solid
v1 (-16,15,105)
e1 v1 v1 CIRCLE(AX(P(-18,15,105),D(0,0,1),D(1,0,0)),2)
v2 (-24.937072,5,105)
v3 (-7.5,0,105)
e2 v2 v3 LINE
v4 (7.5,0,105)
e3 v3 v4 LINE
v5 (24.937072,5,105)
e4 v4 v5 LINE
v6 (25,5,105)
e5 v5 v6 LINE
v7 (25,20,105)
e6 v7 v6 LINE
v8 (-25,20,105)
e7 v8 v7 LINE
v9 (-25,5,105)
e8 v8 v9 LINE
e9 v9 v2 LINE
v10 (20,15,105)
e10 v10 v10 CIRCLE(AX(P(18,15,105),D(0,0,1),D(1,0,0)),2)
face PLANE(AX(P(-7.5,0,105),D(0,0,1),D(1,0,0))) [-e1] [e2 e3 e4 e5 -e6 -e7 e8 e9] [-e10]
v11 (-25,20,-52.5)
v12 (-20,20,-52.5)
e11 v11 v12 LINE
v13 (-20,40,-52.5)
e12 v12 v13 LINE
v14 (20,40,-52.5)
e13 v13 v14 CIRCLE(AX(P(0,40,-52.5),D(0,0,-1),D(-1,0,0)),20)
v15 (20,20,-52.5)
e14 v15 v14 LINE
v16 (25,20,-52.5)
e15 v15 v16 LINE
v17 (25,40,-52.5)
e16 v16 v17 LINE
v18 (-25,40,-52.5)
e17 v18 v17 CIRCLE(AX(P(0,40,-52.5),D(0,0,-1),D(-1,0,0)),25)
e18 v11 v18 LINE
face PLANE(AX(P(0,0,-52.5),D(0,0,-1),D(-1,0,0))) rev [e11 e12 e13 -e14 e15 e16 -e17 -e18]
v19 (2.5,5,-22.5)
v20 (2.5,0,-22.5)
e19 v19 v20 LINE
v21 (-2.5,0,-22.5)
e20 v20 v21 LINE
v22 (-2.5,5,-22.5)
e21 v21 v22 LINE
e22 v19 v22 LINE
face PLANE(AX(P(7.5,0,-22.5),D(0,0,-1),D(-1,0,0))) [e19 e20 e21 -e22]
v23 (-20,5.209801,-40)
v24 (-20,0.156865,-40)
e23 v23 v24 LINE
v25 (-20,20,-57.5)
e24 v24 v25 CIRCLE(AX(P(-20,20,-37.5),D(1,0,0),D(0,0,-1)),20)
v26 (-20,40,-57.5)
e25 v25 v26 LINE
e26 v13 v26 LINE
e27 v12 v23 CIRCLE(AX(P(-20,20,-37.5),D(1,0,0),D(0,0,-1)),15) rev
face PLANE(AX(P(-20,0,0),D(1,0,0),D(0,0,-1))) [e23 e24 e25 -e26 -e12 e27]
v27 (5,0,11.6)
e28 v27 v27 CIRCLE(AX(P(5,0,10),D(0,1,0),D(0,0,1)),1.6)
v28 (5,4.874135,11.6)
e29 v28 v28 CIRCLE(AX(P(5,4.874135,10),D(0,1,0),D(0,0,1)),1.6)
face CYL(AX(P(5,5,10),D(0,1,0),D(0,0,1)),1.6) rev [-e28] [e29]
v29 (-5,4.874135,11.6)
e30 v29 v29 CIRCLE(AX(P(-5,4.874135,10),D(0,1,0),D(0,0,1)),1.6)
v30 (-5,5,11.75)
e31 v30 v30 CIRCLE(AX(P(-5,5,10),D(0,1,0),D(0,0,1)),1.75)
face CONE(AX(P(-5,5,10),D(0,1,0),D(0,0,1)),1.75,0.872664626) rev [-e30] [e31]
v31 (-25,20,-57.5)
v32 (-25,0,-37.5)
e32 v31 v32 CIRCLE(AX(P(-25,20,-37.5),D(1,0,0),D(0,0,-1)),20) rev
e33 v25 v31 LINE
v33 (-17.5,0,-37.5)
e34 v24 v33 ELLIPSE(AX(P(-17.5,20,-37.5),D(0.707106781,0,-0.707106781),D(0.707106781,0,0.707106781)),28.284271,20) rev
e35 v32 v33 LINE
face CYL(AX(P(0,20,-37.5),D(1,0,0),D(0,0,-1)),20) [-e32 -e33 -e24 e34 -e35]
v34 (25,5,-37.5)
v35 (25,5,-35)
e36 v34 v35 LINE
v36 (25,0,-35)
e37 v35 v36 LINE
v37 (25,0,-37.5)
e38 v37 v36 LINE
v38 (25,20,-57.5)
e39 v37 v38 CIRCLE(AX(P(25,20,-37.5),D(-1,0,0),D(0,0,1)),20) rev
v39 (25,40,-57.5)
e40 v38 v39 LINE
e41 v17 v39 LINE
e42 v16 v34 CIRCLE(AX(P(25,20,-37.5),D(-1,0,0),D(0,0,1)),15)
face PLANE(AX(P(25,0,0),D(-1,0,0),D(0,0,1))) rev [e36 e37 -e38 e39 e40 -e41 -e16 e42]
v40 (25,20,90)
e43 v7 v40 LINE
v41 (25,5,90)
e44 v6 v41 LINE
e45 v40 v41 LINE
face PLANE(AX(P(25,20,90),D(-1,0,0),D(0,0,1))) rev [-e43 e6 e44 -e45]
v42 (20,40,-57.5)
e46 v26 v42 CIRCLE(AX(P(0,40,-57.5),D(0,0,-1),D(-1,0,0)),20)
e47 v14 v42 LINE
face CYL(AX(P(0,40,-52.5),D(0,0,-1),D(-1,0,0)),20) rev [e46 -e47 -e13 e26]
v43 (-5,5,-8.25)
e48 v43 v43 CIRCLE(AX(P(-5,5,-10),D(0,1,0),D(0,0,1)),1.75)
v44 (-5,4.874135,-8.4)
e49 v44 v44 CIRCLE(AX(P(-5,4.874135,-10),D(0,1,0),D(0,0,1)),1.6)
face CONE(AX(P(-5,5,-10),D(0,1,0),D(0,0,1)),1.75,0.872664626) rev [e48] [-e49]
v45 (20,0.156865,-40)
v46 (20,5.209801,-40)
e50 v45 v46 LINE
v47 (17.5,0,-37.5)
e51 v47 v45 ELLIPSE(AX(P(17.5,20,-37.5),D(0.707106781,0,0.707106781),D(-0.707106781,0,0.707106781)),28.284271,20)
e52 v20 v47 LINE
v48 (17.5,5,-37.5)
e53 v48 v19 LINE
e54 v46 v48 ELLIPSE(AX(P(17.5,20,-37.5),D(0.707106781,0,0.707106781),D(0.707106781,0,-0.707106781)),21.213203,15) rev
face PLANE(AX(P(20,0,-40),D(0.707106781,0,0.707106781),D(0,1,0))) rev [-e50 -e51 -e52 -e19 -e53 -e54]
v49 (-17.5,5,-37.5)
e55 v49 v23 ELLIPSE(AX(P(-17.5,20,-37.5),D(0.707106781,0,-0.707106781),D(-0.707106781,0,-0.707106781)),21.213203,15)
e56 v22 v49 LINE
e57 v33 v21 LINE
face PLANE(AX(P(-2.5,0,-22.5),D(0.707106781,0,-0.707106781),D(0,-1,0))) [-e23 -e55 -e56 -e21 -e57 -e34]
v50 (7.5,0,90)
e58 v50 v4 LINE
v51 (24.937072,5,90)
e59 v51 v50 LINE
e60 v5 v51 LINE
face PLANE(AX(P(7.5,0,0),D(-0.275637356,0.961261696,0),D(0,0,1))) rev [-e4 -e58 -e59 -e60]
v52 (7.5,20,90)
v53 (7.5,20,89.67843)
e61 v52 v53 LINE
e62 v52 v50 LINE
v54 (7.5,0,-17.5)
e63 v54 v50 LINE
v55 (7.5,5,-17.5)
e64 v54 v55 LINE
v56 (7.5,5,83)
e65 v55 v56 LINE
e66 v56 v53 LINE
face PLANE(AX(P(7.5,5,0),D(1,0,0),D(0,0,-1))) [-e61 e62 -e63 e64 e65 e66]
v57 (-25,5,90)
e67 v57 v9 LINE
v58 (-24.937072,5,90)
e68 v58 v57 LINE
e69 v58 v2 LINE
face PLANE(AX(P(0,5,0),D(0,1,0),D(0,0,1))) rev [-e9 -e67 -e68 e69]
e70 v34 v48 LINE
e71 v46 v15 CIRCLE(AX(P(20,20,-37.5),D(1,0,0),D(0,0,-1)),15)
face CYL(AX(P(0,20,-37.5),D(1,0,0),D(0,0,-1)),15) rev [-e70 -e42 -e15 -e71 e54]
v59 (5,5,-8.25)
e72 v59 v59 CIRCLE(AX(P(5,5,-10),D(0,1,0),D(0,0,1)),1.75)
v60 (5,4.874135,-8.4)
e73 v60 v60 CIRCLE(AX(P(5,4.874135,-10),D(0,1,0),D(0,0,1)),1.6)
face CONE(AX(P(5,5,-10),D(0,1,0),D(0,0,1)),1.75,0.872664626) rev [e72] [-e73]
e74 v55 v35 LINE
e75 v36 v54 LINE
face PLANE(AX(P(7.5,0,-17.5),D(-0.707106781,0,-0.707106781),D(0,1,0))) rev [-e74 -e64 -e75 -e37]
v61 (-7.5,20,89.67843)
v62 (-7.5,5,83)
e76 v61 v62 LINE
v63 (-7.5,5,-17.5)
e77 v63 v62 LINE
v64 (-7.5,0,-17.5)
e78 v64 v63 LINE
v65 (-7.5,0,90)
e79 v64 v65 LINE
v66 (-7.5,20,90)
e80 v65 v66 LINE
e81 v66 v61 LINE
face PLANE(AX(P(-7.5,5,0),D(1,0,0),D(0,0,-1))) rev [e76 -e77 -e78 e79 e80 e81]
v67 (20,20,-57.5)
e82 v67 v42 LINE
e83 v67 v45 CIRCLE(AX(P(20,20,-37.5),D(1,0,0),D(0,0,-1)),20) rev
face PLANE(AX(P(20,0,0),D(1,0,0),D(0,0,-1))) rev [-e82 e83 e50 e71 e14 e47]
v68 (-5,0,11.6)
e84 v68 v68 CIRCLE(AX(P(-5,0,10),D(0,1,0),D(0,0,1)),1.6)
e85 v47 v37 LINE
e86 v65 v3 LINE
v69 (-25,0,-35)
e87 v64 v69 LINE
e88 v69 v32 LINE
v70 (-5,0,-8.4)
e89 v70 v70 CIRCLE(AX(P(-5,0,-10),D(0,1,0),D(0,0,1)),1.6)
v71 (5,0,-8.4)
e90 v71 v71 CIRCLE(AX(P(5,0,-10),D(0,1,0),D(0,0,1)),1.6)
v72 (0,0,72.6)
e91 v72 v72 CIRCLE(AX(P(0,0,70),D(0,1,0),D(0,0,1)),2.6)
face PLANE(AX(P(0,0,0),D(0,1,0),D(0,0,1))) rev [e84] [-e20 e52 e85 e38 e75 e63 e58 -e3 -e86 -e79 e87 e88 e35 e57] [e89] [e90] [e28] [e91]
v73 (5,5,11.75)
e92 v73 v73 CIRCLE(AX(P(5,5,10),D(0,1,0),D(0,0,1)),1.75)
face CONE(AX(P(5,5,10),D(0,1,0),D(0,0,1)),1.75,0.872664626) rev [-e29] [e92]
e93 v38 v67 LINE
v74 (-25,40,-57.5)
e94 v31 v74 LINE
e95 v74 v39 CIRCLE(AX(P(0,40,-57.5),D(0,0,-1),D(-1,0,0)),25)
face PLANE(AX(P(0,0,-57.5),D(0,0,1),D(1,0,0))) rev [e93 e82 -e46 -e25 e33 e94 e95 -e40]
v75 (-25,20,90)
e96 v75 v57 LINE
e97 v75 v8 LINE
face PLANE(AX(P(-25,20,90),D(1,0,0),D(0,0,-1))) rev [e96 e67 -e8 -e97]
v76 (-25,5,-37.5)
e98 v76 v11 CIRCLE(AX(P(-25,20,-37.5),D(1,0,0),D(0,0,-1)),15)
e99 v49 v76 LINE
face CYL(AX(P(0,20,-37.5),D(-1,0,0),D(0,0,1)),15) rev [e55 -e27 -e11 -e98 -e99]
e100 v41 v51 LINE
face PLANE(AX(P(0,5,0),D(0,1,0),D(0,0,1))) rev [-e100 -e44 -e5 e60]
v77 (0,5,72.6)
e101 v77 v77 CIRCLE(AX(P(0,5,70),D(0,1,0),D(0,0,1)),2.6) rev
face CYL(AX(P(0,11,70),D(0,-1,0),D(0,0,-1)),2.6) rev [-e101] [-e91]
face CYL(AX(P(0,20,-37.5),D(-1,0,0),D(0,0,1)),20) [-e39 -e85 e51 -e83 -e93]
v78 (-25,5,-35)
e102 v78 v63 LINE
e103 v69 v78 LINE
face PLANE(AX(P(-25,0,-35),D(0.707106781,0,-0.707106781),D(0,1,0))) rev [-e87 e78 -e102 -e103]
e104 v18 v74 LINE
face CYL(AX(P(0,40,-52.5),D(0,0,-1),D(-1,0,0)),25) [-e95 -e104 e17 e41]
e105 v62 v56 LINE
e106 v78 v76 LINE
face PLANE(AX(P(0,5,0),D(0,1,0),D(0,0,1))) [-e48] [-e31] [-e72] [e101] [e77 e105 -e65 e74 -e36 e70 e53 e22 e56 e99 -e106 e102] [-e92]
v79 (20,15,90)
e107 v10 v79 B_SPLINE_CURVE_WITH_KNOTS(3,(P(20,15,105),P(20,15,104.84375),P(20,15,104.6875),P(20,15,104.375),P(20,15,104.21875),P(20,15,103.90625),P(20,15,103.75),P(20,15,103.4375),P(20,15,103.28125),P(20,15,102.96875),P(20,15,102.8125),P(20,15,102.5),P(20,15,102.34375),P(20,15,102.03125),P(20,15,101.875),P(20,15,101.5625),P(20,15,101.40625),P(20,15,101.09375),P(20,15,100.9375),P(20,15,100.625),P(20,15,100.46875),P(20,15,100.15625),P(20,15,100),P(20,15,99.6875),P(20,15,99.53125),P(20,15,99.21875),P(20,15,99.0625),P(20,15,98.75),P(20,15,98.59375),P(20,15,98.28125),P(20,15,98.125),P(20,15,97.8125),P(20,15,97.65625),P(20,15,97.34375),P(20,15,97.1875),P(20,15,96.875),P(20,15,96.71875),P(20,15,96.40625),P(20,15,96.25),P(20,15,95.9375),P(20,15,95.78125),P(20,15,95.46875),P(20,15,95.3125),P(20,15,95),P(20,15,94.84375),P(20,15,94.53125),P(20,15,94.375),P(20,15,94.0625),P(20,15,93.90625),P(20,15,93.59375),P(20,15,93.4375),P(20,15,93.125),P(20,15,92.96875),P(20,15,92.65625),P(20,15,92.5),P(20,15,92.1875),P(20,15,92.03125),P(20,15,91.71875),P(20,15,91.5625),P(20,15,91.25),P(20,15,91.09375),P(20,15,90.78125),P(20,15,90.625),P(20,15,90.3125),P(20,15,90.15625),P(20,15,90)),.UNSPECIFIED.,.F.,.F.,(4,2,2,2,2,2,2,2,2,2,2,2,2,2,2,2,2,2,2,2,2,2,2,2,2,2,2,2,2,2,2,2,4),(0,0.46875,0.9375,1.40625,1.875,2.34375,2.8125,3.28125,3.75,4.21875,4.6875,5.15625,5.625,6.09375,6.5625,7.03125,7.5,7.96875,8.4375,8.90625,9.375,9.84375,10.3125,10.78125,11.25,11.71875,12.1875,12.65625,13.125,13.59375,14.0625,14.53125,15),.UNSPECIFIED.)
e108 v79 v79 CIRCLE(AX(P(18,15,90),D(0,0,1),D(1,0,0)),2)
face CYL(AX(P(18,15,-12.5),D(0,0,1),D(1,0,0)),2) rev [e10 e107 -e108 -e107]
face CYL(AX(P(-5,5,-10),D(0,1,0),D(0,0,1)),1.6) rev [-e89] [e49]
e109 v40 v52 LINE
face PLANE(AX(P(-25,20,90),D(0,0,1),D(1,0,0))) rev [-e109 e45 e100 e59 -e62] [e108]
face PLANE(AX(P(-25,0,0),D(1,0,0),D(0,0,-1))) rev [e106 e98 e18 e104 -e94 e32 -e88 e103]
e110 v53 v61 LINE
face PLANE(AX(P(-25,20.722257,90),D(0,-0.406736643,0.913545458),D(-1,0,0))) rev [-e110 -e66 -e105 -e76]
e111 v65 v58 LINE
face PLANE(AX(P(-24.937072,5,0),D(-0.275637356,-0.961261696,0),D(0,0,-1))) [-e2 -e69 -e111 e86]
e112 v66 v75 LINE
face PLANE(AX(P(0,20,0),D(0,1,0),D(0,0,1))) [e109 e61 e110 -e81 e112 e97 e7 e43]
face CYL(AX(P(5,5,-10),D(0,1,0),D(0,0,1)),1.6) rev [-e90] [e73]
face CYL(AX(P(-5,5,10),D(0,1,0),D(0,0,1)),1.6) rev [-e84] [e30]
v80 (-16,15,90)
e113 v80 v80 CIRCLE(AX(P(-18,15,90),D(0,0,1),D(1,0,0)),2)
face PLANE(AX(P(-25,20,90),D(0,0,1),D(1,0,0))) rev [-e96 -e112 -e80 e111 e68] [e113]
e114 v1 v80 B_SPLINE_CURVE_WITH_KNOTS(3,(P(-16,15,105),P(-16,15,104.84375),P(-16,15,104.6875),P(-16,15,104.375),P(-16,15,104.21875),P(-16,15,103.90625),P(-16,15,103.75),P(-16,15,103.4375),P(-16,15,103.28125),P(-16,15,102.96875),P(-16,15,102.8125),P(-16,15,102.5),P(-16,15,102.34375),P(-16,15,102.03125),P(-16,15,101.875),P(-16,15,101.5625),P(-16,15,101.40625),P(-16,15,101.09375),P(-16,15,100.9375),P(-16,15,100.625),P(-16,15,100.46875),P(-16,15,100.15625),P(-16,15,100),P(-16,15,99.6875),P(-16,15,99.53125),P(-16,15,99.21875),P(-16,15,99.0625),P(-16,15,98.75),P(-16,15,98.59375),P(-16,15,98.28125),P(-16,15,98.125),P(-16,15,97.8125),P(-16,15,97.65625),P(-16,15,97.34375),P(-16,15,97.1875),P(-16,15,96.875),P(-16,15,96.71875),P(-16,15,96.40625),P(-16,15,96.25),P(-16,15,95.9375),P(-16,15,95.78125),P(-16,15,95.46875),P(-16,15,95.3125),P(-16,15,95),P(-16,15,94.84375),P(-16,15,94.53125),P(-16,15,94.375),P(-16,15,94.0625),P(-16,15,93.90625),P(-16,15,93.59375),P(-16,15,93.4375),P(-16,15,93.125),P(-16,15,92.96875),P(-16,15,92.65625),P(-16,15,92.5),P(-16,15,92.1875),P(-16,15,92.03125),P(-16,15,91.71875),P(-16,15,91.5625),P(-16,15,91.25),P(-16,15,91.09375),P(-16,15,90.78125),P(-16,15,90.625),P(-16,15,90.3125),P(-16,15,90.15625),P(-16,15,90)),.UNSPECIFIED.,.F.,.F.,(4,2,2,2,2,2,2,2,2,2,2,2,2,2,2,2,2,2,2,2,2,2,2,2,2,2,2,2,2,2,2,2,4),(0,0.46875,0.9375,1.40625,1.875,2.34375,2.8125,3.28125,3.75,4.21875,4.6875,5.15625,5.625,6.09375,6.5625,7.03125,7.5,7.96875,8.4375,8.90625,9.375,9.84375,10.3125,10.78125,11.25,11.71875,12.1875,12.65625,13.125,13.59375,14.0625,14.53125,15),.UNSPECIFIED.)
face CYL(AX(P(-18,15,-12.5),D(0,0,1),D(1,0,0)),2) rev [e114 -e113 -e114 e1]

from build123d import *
from OCP.BRepFilletAPI import BRepFilletAPI_MakeChamfer

# Parameters (mm, degrees)
SKETCH1_W           = 15
SKETCH1_H           = 27.5
SKETCH1_W_2         = 10
SKETCH1_H_2         = 20
BOSS_EXTRUDE1_DEPTH = 5
SKETCH8_W           = 15
SKETCH8_H           = 90
BOSS_EXTRUDE2_DEPTH = 5
SKETCH9_R           = 2.6
CUT_EXTRUDE1_DEPTH  = 11
SKETCH11_W          = 50
SKETCH11_H          = 15
BOSS_EXTRUDE4_DEPTH = 15
CHAMFER1_SIZE       = 5
CHAMFER1_SIZE_2     = 17.437072219
CHAMFER2_SIZE       = 15.722257417
CHAMFER2_SIZE_2     = 7
SKETCH12_R          = 2
CUT_EXTRUDE2_DEPTH  = 122.783619588
SKETCH13_W          = 15
SKETCH13_H          = 10
BOSS_EXTRUDE5_DEPTH = 5
SKETCH15_W          = 5
SKETCH15_H          = 35
BOSS_EXTRUDE7_DEPTH = 5
BOSS_EXTRUDE8_DEPTH = 5
FILLET1_R           = 15
FILLET2_R           = 20
CHAMFER3_SIZE       = 17.5


# Read off the part's stored shape, not the designer's step: Ø3.0mm Dowel Hole1
# Some blends are built 0.0001 mm under size
with BuildPart() as part:
    # Sketch1 → Boss-Extrude1 (new body)
    # profile 1 of 2: a face of its own
    with BuildSketch(Plane(origin=(0, 0, 0), x_dir=(1, 0, 0), z_dir=(0, 1, 0))):
        with Locations((0, -1.25)):
            Rectangle(SKETCH1_W, SKETCH1_H)
        Rectangle(SKETCH1_W_2, SKETCH1_H_2, mode=Mode.SUBTRACT)
    # profile 2 of 2: a face of its own
    with BuildSketch(Plane(origin=(0, 0, 0), x_dir=(1, 0, 0), z_dir=(0, 1, 0))):
        Rectangle(SKETCH1_W_2, SKETCH1_H_2)
    extrude(amount=BOSS_EXTRUDE1_DEPTH)

    # Ø3.0mm Dowel Hole1 outline → Ø3.0mm Dowel Hole1 (revolve, cut)
    with BuildSketch(Plane(origin=(5, 0, -10), x_dir=(1, 0, 0), z_dir=(0, 0, 1))):
        Polygon((0, 0), (1.6, 0), (1.6, 4.874135055), (1.75, 5), (0, 5), align=None)
    revolve(axis=Axis((5, 0, -10), (0, 1, 0)), mode=Mode.SUBTRACT)

    # 3.0mm Dowel Hole1 2 outline → 3.0mm Dowel Hole1 2 (revolve, cut)
    with BuildSketch(Plane(origin=(-5, 0, 10), x_dir=(1, 0, 0), z_dir=(0, 0, 1))):
        Polygon((0, 0), (1.6, 0), (1.6, 4.874135055), (1.75, 5), (0, 5), align=None)
    revolve(axis=Axis((-5, 0, 10), (0, 1, 0)), mode=Mode.SUBTRACT)

    # 3.0mm Dowel Hole1 3 outline → 3.0mm Dowel Hole1 3 (revolve, cut)
    with BuildSketch(Plane(origin=(-5, 0, -10), x_dir=(1, 0, 0), z_dir=(0, 0, 1))):
        Polygon((0, 0), (1.6, 0), (1.6, 4.874135055), (1.75, 5), (0, 5), align=None)
    revolve(axis=Axis((-5, 0, -10), (0, 1, 0)), mode=Mode.SUBTRACT)

    # 3.0mm Dowel Hole1 4 outline → 3.0mm Dowel Hole1 4 (revolve, cut)
    with BuildSketch(Plane(origin=(5, 0, 10), x_dir=(1, 0, 0), z_dir=(0, 0, 1))):
        Polygon((0, 0), (1.6, 0), (1.6, 4.874135055), (1.75, 5), (0, 5), align=None)
    revolve(axis=Axis((5, 0, 10), (0, 1, 0)), mode=Mode.SUBTRACT)

    # Sketch8 → Boss-Extrude2 (add)
    with BuildSketch(Plane(origin=(0, 5, 0), x_dir=(1, 0, 0), z_dir=(0, 1, 0))):
        with Locations((0, -60)):
            Rectangle(SKETCH8_W, SKETCH8_H)
    extrude(amount=-BOSS_EXTRUDE2_DEPTH)

    # Sketch9 → Cut-Extrude1 (cut)
    with BuildSketch(Plane(origin=(0, 0, 0), x_dir=(1, 0, 0), z_dir=(0, 1, 0))):
        with Locations(Location((0, -70, 0), (0, 0, 270))):
            Circle(SKETCH9_R)
    extrude(amount=CUT_EXTRUDE1_DEPTH, mode=Mode.SUBTRACT)

    # Sketch11 → Boss-Extrude4 (add)
    with BuildSketch(Plane(origin=(0, 5, 0), x_dir=(1, 0, 0), z_dir=(0, 1, 0))):
        with Locations((0, -97.5)):
            Rectangle(SKETCH11_W, SKETCH11_H)
    extrude(amount=BOSS_EXTRUDE4_DEPTH)

    # Chamfer1
    chamfer1_edges_1 = [part.edges().sort_by_distance(p)[0] for p in [
        (7.5, 5, 97.5),
    ]]
    chamfer1_side_1 = [part.faces().sort_by_distance(p)[0] for p in [
        (7.5, 4.9, 97.5),
    ]]
    chamfer1_edges_2 = [part.edges().sort_by_distance(p)[0] for p in [
        (-7.5, 5, 97.5),
    ]]
    chamfer1_side_2 = [part.faces().sort_by_distance(p)[0] for p in [
        (-7.5, 4.9, 97.5),
    ]]
    chamfer1 = BRepFilletAPI_MakeChamfer(part.part.solid().wrapped)
    for e in chamfer1_edges_1:
        chamfer1.Add(CHAMFER1_SIZE - 0.0001, CHAMFER1_SIZE_2 - 0.0001, e.wrapped, chamfer1_side_1[0].wrapped)
    for e in chamfer1_edges_2:
        chamfer1.Add(CHAMFER1_SIZE - 0.0001, CHAMFER1_SIZE_2 - 0.0001, e.wrapped, chamfer1_side_2[0].wrapped)
    add(Compound.cast(chamfer1.Shape()), mode=Mode.REPLACE)  # a hair under: the kernel refuses the full size

    # Chamfer2
    # the kernel refuses this chamfer: 15.722257417, 7 mm, written as the material it adds along each edge
    with BuildSketch(Plane(origin=(-7.5, 5, 90), x_dir=(0, 0.9998768419809391, 0.015693975602887097), z_dir=(1, 0, 0))) as chamfer2_piece_1_section:
        Polygon((CHAMFER2_SIZE * 0.999876842002, -CHAMFER2_SIZE * 0.0156939756032), (-CHAMFER2_SIZE_2 * 0.0156939756029, -CHAMFER2_SIZE_2 * 0.999876841981), (0, 0), align=None)
    chamfer2_piece_1 = extrude(amount=15, mode=Mode.PRIVATE)
    chamfer2_piece_1 = split(chamfer2_piece_1, bisect_by=Plane(origin=(0, 20, 87.661958793), z_dir=(0, -1, 0)), keep=Keep.TOP, mode=Mode.PRIVATE)
    add(chamfer2_piece_1)

    # Sketch12 → Cut-Extrude2 (cut, through all)
    with BuildSketch(Plane.XY.offset(105)):
        with Locations((-18, 15)):
            Circle(SKETCH12_R)
        with Locations((18, 15)):
            Circle(SKETCH12_R)
    extrude(amount=-CUT_EXTRUDE2_DEPTH, mode=Mode.SUBTRACT)

    # Sketch13 → Boss-Extrude5 (add)
    with BuildSketch(Plane(origin=(0, 5, 0), x_dir=(1, 0, 0), z_dir=(0, 1, 0))):
        with Locations((0, 17.5)):
            Rectangle(SKETCH13_W, SKETCH13_H)
    extrude(amount=-BOSS_EXTRUDE5_DEPTH)

    # Sketch15 → Boss-Extrude7 (add)
    with BuildSketch(Plane(origin=(0, 5, 0), x_dir=(1, 0, 0), z_dir=(0, 1, 0))):
        with Locations((-22.5, 40)):
            Rectangle(SKETCH15_W, SKETCH15_H)
        Polygon((-7.5, 17.5), (-7.5, 22.5), (-20, 22.5), (-25, 22.5), (-25, 17.5), align=None)
        Polygon((25, 17.5), (25, 22.5), (20, 22.5), (7.5, 22.5), (7.5, 17.5), align=None)
        with Locations((22.5, 40)):
            Rectangle(SKETCH15_W, SKETCH15_H)
    extrude(amount=-BOSS_EXTRUDE7_DEPTH)

    # Sketch16 → Boss-Extrude8 (add)
    with BuildSketch(Plane(origin=(0, 0, -57.5), x_dir=(-1, 0, 0), z_dir=(0, 0, -1))):
        with BuildLine():
            Line((-20, 40), (-25, 40))
            ThreePointArc((-25, 40), (-23.717082451, 32.09430585), (-20, 25))
            Line((-20, 25), (-20, 40))
        make_face()
        with BuildLine():
            Line((20, 40), (25, 40))
            ThreePointArc((25, 40), (0, 65), (-25, 40))
            Line((-25, 40), (-20, 40))
            ThreePointArc((-20, 40), (0, 60), (20, 40))
        make_face()
        with BuildLine():
            ThreePointArc((20, 25), (23.717082451, 32.09430585), (25, 40))
            Line((25, 40), (20, 40))
            Line((20, 40), (20, 25))
        make_face()
        with BuildLine():
            Line((20, 5), (25, 5))
            Line((25, 5), (25, 40))
            ThreePointArc((25, 40), (23.717082451, 32.09430585), (20, 25))
            Line((20, 25), (20, 5))
        make_face()
        with BuildLine():
            ThreePointArc((-20, 25), (-23.717082451, 32.09430585), (-25, 40))
            Line((-25, 40), (-25, 0))
            Line((-25, 0), (-20, 0))
            Line((-20, 0), (-20, 25))
        make_face()
    extrude(amount=-BOSS_EXTRUDE8_DEPTH)

    # Fillet1
    fillet1_edges = [part.edges().sort_by_distance(p)[0] for p in [
        (-22.5, 5, -52.5),
        (22.5, 5, -52.5),
    ]]
    fillet(fillet1_edges, radius=FILLET1_R)

    # Fillet2
    fillet2_edges = [part.edges().sort_by_distance(p)[0] for p in [
        (-22.5, 0, -57.5),
        (22.5, 0, -57.5),
    ]]
    fillet(fillet2_edges, radius=FILLET2_R)

    # Chamfer3
    chamfer3_edges = [part.edges().sort_by_distance(p)[0] for p in [
        (-25, 2.5, -17.5),
        (-20, 2.5, -22.5),
        (25, 2.5, -17.5),
        (20, 2.5, -22.5),
    ]]
    chamfer(chamfer3_edges, length=CHAMFER3_SIZE - 0.0001)  # a hair under: the kernel refuses the full size


solid = part.part
